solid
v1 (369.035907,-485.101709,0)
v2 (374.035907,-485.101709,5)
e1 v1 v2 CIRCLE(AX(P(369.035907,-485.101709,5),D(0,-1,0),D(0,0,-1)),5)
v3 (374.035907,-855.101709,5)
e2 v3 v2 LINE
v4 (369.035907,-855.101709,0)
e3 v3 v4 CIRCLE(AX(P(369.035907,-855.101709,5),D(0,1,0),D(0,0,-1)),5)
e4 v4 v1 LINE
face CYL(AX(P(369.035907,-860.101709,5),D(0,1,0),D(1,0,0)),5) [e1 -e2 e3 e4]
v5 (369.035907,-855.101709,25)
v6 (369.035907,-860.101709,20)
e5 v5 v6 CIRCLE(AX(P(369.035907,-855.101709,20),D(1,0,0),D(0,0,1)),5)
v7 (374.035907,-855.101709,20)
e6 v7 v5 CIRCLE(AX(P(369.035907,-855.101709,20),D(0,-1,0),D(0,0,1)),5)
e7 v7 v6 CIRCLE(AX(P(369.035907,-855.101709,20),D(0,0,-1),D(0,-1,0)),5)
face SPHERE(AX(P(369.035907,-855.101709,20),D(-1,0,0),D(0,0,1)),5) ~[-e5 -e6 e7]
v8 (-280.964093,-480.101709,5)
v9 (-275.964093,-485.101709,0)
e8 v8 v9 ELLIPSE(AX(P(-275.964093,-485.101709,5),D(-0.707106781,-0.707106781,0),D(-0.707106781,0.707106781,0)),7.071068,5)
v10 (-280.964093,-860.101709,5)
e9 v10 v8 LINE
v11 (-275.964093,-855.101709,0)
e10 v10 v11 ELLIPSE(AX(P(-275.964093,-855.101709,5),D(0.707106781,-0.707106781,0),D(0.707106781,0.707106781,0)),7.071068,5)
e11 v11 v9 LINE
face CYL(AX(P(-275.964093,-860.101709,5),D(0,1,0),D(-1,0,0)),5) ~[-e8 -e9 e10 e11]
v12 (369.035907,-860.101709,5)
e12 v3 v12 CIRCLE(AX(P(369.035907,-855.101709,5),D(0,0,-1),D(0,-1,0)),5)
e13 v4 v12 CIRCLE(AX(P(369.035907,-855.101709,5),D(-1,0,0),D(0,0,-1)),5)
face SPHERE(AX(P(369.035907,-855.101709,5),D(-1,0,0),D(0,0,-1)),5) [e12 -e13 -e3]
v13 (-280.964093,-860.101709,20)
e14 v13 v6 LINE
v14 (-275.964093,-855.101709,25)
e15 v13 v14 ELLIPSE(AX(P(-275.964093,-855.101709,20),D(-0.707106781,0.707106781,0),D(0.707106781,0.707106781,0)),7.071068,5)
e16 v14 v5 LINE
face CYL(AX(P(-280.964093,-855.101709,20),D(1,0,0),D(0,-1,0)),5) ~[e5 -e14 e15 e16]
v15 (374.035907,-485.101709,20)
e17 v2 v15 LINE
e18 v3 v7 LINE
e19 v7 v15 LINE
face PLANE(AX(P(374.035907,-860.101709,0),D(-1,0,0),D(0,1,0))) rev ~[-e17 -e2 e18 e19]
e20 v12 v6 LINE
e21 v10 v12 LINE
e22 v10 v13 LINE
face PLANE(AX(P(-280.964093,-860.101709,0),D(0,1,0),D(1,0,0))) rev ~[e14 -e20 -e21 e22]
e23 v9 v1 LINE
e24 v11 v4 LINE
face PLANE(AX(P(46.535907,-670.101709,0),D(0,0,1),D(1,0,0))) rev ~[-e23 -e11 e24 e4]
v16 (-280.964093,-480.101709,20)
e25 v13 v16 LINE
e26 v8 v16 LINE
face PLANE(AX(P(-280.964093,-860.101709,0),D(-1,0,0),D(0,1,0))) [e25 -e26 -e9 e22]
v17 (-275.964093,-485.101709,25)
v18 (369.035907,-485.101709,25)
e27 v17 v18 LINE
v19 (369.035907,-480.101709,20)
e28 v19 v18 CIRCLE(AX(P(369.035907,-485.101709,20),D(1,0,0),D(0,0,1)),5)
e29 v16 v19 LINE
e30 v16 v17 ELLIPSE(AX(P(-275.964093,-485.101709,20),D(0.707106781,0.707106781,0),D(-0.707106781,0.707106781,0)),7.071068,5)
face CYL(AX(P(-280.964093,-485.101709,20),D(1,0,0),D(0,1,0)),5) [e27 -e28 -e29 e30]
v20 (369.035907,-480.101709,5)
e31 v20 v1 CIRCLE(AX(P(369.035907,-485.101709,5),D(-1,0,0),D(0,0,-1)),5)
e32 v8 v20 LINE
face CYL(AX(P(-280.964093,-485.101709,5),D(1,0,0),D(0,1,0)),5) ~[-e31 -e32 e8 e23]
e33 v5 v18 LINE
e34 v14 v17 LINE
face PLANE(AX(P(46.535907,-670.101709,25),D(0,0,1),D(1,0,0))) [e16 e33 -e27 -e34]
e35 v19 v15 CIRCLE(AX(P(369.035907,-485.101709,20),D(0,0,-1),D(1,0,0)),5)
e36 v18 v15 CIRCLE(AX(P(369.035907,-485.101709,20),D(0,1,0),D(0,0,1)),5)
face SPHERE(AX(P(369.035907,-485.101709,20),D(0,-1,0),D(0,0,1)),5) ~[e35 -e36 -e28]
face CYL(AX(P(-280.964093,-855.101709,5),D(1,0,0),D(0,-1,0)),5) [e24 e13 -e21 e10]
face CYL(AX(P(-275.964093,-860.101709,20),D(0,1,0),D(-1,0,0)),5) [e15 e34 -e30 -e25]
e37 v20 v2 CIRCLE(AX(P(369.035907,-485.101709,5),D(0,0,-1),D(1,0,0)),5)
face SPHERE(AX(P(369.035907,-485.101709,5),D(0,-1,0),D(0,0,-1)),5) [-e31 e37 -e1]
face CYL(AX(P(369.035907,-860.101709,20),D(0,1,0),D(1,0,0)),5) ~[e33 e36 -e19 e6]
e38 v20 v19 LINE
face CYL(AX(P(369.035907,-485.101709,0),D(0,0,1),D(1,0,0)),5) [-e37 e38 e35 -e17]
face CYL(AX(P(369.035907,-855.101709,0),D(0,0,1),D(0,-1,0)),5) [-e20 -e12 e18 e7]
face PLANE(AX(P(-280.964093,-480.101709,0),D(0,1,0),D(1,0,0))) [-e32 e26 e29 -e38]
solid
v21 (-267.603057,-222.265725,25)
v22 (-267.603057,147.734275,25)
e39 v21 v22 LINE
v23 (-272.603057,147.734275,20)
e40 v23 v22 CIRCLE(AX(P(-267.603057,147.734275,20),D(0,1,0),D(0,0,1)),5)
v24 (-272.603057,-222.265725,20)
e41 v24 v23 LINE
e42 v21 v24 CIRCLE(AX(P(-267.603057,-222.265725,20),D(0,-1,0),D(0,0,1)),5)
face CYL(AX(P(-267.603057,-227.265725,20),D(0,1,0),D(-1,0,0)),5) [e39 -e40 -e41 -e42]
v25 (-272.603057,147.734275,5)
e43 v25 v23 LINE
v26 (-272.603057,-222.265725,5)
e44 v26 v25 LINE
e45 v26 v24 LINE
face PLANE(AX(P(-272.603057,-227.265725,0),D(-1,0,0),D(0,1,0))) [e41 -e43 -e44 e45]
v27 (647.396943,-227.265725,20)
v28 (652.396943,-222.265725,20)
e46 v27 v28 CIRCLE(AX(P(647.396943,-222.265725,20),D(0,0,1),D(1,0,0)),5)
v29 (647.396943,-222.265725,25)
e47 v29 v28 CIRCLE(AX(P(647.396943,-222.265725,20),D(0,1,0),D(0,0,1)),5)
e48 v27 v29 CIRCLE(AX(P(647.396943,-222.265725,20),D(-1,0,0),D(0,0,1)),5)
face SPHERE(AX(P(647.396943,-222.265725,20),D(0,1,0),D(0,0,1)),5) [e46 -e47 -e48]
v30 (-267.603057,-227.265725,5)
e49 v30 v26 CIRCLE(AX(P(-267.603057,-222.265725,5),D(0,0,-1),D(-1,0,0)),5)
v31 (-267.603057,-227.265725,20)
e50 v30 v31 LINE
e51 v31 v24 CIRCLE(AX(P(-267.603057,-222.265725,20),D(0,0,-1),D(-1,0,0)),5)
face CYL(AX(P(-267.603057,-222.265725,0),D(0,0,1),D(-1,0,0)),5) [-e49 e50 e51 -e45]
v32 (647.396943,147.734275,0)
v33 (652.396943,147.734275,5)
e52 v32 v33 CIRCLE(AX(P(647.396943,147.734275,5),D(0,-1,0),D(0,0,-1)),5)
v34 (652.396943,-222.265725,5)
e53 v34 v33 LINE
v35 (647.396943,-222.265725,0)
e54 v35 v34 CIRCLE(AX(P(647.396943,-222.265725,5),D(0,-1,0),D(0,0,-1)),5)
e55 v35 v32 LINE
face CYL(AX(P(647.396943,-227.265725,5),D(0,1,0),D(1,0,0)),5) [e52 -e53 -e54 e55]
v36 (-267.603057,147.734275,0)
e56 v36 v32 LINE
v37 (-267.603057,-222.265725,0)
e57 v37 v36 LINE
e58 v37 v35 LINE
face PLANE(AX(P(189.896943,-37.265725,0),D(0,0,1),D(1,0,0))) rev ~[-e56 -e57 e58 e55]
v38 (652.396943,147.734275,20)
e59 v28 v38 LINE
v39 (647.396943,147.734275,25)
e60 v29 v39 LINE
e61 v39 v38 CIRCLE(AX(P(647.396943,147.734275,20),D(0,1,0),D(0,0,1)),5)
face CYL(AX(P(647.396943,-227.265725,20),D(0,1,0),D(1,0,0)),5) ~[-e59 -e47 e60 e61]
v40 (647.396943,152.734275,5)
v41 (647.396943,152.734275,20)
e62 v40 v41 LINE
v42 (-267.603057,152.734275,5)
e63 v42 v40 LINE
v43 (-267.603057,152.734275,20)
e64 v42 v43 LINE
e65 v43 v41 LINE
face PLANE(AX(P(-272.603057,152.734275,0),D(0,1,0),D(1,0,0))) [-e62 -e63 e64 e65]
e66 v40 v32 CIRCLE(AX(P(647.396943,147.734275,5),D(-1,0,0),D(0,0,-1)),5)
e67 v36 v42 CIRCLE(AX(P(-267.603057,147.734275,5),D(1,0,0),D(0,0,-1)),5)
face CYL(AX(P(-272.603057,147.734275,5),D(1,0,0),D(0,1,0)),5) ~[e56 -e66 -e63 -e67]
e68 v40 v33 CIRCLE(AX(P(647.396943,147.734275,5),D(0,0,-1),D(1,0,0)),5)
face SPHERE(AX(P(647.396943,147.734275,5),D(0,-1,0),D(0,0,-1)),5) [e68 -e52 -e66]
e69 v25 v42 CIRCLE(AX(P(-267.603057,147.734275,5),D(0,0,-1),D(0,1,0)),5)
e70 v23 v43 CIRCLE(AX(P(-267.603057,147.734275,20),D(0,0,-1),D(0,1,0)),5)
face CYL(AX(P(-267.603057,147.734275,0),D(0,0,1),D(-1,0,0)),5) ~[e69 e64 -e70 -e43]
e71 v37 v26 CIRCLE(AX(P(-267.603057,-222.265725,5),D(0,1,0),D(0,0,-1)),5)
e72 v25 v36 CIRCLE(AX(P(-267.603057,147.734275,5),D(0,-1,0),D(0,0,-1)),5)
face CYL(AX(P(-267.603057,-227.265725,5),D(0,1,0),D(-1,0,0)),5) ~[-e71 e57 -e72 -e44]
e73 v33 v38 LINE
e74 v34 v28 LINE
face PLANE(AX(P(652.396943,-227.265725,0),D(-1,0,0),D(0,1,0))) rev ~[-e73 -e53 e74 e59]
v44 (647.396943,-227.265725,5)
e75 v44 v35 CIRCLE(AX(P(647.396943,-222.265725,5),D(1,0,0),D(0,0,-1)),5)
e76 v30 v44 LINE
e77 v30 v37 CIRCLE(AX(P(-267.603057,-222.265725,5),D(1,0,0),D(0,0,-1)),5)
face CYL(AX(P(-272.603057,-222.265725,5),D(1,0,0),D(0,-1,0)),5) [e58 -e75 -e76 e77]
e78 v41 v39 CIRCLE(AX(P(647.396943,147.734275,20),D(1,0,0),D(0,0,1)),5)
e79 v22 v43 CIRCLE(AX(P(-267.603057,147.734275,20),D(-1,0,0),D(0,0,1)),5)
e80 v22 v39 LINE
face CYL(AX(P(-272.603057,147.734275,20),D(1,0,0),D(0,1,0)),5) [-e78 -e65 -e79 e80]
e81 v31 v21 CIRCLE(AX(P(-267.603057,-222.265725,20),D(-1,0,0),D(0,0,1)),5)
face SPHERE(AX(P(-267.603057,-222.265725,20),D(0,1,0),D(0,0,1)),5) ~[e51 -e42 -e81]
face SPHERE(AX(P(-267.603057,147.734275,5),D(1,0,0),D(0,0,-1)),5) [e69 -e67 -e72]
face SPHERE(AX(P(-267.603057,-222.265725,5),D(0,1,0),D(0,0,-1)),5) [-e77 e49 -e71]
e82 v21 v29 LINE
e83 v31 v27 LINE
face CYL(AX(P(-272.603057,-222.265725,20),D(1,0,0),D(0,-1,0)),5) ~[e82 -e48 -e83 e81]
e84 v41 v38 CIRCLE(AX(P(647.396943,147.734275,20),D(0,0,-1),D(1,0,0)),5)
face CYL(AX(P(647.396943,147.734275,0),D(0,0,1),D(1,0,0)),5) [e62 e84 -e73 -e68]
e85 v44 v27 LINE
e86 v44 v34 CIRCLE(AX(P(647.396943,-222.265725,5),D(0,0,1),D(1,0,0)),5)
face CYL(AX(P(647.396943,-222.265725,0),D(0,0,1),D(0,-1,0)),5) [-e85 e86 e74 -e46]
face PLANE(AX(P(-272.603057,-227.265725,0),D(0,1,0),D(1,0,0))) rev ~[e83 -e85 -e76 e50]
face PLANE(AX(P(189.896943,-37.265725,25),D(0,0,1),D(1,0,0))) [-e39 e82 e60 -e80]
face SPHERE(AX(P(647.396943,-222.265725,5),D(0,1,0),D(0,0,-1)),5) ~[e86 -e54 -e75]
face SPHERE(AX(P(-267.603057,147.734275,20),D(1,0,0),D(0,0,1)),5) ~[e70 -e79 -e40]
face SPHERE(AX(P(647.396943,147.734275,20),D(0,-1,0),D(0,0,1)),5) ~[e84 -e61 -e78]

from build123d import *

# Parameters (mm, degrees)
F0_W     = 655
F0_H     = 380
F1_DEPTH = 25
F3_DEPTH = 380.001
F4_R     = 5
F5_W     = 925
F5_H     = 380
F6_DEPTH = 25
F7_R     = 5


with BuildPart() as f1:
    # F0 (on Top) → F1 (new body)
    with BuildSketch(Plane.XY):
        with Locations((46.5359067917, -670.1017089717)):
            Rectangle(F0_W, F0_H)
    extrude(amount=F1_DEPTH)

    # F2 (on face) → F3 (cut, through all)
    with BuildSketch(Plane.XZ.offset(860.1017089717)):
        Polygon((-329.5351266861, 5.0213485956), (-321.2029933929, 5.0213038921), (-293.8260436058, 27.9015563428), (-329.5351266861, 27.9015563428), align=None)
    extrude(amount=-F3_DEPTH, mode=Mode.SUBTRACT)

    # F4
    f4_edges = [f1.edges().sort_by_distance(p)[0] for p in [
        (-280.964093, -670.101709, 25),
        (46.535907, -860.101709, 25),
        (374.035907, -670.101709, 25),
        (46.535907, -480.101709, 25),
        (-280.964093, -670.101709, 0),
        (46.535907, -860.101709, 0),
        (374.035907, -670.101709, 0),
        (46.535907, -480.101709, 0),
        (374.035907, -860.101709, 12.5),
        (374.035907, -480.101709, 12.5),
    ]]
    fillet(f4_edges, radius=F4_R)


with BuildPart() as f6:
    # F5 (on Top) → F6 (new body)
    with BuildSketch(Plane.XY):
        with Locations((189.8969432941, -37.2657254338)):
            Rectangle(F5_W, F5_H)
    extrude(amount=F6_DEPTH)

    # F7
    f7_edges = [f6.edges().sort_by_distance(p)[0] for p in [
        (652.396943, -37.265725, 25),
        (189.896943, 152.734275, 25),
        (-272.603057, -37.265725, 25),
        (189.896943, -227.265725, 25),
        (652.396943, -37.265725, 0),
        (189.896943, 152.734275, 0),
        (-272.603057, -37.265725, 0),
        (189.896943, -227.265725, 0),
        (652.396943, 152.734275, 12.5),
        (-272.603057, 152.734275, 12.5),
        (-272.603057, -227.265725, 12.5),
        (652.396943, -227.265725, 12.5),
    ]]
    fillet(f7_edges, radius=F7_R)


solid = Compound([f1.part, f6.part])
